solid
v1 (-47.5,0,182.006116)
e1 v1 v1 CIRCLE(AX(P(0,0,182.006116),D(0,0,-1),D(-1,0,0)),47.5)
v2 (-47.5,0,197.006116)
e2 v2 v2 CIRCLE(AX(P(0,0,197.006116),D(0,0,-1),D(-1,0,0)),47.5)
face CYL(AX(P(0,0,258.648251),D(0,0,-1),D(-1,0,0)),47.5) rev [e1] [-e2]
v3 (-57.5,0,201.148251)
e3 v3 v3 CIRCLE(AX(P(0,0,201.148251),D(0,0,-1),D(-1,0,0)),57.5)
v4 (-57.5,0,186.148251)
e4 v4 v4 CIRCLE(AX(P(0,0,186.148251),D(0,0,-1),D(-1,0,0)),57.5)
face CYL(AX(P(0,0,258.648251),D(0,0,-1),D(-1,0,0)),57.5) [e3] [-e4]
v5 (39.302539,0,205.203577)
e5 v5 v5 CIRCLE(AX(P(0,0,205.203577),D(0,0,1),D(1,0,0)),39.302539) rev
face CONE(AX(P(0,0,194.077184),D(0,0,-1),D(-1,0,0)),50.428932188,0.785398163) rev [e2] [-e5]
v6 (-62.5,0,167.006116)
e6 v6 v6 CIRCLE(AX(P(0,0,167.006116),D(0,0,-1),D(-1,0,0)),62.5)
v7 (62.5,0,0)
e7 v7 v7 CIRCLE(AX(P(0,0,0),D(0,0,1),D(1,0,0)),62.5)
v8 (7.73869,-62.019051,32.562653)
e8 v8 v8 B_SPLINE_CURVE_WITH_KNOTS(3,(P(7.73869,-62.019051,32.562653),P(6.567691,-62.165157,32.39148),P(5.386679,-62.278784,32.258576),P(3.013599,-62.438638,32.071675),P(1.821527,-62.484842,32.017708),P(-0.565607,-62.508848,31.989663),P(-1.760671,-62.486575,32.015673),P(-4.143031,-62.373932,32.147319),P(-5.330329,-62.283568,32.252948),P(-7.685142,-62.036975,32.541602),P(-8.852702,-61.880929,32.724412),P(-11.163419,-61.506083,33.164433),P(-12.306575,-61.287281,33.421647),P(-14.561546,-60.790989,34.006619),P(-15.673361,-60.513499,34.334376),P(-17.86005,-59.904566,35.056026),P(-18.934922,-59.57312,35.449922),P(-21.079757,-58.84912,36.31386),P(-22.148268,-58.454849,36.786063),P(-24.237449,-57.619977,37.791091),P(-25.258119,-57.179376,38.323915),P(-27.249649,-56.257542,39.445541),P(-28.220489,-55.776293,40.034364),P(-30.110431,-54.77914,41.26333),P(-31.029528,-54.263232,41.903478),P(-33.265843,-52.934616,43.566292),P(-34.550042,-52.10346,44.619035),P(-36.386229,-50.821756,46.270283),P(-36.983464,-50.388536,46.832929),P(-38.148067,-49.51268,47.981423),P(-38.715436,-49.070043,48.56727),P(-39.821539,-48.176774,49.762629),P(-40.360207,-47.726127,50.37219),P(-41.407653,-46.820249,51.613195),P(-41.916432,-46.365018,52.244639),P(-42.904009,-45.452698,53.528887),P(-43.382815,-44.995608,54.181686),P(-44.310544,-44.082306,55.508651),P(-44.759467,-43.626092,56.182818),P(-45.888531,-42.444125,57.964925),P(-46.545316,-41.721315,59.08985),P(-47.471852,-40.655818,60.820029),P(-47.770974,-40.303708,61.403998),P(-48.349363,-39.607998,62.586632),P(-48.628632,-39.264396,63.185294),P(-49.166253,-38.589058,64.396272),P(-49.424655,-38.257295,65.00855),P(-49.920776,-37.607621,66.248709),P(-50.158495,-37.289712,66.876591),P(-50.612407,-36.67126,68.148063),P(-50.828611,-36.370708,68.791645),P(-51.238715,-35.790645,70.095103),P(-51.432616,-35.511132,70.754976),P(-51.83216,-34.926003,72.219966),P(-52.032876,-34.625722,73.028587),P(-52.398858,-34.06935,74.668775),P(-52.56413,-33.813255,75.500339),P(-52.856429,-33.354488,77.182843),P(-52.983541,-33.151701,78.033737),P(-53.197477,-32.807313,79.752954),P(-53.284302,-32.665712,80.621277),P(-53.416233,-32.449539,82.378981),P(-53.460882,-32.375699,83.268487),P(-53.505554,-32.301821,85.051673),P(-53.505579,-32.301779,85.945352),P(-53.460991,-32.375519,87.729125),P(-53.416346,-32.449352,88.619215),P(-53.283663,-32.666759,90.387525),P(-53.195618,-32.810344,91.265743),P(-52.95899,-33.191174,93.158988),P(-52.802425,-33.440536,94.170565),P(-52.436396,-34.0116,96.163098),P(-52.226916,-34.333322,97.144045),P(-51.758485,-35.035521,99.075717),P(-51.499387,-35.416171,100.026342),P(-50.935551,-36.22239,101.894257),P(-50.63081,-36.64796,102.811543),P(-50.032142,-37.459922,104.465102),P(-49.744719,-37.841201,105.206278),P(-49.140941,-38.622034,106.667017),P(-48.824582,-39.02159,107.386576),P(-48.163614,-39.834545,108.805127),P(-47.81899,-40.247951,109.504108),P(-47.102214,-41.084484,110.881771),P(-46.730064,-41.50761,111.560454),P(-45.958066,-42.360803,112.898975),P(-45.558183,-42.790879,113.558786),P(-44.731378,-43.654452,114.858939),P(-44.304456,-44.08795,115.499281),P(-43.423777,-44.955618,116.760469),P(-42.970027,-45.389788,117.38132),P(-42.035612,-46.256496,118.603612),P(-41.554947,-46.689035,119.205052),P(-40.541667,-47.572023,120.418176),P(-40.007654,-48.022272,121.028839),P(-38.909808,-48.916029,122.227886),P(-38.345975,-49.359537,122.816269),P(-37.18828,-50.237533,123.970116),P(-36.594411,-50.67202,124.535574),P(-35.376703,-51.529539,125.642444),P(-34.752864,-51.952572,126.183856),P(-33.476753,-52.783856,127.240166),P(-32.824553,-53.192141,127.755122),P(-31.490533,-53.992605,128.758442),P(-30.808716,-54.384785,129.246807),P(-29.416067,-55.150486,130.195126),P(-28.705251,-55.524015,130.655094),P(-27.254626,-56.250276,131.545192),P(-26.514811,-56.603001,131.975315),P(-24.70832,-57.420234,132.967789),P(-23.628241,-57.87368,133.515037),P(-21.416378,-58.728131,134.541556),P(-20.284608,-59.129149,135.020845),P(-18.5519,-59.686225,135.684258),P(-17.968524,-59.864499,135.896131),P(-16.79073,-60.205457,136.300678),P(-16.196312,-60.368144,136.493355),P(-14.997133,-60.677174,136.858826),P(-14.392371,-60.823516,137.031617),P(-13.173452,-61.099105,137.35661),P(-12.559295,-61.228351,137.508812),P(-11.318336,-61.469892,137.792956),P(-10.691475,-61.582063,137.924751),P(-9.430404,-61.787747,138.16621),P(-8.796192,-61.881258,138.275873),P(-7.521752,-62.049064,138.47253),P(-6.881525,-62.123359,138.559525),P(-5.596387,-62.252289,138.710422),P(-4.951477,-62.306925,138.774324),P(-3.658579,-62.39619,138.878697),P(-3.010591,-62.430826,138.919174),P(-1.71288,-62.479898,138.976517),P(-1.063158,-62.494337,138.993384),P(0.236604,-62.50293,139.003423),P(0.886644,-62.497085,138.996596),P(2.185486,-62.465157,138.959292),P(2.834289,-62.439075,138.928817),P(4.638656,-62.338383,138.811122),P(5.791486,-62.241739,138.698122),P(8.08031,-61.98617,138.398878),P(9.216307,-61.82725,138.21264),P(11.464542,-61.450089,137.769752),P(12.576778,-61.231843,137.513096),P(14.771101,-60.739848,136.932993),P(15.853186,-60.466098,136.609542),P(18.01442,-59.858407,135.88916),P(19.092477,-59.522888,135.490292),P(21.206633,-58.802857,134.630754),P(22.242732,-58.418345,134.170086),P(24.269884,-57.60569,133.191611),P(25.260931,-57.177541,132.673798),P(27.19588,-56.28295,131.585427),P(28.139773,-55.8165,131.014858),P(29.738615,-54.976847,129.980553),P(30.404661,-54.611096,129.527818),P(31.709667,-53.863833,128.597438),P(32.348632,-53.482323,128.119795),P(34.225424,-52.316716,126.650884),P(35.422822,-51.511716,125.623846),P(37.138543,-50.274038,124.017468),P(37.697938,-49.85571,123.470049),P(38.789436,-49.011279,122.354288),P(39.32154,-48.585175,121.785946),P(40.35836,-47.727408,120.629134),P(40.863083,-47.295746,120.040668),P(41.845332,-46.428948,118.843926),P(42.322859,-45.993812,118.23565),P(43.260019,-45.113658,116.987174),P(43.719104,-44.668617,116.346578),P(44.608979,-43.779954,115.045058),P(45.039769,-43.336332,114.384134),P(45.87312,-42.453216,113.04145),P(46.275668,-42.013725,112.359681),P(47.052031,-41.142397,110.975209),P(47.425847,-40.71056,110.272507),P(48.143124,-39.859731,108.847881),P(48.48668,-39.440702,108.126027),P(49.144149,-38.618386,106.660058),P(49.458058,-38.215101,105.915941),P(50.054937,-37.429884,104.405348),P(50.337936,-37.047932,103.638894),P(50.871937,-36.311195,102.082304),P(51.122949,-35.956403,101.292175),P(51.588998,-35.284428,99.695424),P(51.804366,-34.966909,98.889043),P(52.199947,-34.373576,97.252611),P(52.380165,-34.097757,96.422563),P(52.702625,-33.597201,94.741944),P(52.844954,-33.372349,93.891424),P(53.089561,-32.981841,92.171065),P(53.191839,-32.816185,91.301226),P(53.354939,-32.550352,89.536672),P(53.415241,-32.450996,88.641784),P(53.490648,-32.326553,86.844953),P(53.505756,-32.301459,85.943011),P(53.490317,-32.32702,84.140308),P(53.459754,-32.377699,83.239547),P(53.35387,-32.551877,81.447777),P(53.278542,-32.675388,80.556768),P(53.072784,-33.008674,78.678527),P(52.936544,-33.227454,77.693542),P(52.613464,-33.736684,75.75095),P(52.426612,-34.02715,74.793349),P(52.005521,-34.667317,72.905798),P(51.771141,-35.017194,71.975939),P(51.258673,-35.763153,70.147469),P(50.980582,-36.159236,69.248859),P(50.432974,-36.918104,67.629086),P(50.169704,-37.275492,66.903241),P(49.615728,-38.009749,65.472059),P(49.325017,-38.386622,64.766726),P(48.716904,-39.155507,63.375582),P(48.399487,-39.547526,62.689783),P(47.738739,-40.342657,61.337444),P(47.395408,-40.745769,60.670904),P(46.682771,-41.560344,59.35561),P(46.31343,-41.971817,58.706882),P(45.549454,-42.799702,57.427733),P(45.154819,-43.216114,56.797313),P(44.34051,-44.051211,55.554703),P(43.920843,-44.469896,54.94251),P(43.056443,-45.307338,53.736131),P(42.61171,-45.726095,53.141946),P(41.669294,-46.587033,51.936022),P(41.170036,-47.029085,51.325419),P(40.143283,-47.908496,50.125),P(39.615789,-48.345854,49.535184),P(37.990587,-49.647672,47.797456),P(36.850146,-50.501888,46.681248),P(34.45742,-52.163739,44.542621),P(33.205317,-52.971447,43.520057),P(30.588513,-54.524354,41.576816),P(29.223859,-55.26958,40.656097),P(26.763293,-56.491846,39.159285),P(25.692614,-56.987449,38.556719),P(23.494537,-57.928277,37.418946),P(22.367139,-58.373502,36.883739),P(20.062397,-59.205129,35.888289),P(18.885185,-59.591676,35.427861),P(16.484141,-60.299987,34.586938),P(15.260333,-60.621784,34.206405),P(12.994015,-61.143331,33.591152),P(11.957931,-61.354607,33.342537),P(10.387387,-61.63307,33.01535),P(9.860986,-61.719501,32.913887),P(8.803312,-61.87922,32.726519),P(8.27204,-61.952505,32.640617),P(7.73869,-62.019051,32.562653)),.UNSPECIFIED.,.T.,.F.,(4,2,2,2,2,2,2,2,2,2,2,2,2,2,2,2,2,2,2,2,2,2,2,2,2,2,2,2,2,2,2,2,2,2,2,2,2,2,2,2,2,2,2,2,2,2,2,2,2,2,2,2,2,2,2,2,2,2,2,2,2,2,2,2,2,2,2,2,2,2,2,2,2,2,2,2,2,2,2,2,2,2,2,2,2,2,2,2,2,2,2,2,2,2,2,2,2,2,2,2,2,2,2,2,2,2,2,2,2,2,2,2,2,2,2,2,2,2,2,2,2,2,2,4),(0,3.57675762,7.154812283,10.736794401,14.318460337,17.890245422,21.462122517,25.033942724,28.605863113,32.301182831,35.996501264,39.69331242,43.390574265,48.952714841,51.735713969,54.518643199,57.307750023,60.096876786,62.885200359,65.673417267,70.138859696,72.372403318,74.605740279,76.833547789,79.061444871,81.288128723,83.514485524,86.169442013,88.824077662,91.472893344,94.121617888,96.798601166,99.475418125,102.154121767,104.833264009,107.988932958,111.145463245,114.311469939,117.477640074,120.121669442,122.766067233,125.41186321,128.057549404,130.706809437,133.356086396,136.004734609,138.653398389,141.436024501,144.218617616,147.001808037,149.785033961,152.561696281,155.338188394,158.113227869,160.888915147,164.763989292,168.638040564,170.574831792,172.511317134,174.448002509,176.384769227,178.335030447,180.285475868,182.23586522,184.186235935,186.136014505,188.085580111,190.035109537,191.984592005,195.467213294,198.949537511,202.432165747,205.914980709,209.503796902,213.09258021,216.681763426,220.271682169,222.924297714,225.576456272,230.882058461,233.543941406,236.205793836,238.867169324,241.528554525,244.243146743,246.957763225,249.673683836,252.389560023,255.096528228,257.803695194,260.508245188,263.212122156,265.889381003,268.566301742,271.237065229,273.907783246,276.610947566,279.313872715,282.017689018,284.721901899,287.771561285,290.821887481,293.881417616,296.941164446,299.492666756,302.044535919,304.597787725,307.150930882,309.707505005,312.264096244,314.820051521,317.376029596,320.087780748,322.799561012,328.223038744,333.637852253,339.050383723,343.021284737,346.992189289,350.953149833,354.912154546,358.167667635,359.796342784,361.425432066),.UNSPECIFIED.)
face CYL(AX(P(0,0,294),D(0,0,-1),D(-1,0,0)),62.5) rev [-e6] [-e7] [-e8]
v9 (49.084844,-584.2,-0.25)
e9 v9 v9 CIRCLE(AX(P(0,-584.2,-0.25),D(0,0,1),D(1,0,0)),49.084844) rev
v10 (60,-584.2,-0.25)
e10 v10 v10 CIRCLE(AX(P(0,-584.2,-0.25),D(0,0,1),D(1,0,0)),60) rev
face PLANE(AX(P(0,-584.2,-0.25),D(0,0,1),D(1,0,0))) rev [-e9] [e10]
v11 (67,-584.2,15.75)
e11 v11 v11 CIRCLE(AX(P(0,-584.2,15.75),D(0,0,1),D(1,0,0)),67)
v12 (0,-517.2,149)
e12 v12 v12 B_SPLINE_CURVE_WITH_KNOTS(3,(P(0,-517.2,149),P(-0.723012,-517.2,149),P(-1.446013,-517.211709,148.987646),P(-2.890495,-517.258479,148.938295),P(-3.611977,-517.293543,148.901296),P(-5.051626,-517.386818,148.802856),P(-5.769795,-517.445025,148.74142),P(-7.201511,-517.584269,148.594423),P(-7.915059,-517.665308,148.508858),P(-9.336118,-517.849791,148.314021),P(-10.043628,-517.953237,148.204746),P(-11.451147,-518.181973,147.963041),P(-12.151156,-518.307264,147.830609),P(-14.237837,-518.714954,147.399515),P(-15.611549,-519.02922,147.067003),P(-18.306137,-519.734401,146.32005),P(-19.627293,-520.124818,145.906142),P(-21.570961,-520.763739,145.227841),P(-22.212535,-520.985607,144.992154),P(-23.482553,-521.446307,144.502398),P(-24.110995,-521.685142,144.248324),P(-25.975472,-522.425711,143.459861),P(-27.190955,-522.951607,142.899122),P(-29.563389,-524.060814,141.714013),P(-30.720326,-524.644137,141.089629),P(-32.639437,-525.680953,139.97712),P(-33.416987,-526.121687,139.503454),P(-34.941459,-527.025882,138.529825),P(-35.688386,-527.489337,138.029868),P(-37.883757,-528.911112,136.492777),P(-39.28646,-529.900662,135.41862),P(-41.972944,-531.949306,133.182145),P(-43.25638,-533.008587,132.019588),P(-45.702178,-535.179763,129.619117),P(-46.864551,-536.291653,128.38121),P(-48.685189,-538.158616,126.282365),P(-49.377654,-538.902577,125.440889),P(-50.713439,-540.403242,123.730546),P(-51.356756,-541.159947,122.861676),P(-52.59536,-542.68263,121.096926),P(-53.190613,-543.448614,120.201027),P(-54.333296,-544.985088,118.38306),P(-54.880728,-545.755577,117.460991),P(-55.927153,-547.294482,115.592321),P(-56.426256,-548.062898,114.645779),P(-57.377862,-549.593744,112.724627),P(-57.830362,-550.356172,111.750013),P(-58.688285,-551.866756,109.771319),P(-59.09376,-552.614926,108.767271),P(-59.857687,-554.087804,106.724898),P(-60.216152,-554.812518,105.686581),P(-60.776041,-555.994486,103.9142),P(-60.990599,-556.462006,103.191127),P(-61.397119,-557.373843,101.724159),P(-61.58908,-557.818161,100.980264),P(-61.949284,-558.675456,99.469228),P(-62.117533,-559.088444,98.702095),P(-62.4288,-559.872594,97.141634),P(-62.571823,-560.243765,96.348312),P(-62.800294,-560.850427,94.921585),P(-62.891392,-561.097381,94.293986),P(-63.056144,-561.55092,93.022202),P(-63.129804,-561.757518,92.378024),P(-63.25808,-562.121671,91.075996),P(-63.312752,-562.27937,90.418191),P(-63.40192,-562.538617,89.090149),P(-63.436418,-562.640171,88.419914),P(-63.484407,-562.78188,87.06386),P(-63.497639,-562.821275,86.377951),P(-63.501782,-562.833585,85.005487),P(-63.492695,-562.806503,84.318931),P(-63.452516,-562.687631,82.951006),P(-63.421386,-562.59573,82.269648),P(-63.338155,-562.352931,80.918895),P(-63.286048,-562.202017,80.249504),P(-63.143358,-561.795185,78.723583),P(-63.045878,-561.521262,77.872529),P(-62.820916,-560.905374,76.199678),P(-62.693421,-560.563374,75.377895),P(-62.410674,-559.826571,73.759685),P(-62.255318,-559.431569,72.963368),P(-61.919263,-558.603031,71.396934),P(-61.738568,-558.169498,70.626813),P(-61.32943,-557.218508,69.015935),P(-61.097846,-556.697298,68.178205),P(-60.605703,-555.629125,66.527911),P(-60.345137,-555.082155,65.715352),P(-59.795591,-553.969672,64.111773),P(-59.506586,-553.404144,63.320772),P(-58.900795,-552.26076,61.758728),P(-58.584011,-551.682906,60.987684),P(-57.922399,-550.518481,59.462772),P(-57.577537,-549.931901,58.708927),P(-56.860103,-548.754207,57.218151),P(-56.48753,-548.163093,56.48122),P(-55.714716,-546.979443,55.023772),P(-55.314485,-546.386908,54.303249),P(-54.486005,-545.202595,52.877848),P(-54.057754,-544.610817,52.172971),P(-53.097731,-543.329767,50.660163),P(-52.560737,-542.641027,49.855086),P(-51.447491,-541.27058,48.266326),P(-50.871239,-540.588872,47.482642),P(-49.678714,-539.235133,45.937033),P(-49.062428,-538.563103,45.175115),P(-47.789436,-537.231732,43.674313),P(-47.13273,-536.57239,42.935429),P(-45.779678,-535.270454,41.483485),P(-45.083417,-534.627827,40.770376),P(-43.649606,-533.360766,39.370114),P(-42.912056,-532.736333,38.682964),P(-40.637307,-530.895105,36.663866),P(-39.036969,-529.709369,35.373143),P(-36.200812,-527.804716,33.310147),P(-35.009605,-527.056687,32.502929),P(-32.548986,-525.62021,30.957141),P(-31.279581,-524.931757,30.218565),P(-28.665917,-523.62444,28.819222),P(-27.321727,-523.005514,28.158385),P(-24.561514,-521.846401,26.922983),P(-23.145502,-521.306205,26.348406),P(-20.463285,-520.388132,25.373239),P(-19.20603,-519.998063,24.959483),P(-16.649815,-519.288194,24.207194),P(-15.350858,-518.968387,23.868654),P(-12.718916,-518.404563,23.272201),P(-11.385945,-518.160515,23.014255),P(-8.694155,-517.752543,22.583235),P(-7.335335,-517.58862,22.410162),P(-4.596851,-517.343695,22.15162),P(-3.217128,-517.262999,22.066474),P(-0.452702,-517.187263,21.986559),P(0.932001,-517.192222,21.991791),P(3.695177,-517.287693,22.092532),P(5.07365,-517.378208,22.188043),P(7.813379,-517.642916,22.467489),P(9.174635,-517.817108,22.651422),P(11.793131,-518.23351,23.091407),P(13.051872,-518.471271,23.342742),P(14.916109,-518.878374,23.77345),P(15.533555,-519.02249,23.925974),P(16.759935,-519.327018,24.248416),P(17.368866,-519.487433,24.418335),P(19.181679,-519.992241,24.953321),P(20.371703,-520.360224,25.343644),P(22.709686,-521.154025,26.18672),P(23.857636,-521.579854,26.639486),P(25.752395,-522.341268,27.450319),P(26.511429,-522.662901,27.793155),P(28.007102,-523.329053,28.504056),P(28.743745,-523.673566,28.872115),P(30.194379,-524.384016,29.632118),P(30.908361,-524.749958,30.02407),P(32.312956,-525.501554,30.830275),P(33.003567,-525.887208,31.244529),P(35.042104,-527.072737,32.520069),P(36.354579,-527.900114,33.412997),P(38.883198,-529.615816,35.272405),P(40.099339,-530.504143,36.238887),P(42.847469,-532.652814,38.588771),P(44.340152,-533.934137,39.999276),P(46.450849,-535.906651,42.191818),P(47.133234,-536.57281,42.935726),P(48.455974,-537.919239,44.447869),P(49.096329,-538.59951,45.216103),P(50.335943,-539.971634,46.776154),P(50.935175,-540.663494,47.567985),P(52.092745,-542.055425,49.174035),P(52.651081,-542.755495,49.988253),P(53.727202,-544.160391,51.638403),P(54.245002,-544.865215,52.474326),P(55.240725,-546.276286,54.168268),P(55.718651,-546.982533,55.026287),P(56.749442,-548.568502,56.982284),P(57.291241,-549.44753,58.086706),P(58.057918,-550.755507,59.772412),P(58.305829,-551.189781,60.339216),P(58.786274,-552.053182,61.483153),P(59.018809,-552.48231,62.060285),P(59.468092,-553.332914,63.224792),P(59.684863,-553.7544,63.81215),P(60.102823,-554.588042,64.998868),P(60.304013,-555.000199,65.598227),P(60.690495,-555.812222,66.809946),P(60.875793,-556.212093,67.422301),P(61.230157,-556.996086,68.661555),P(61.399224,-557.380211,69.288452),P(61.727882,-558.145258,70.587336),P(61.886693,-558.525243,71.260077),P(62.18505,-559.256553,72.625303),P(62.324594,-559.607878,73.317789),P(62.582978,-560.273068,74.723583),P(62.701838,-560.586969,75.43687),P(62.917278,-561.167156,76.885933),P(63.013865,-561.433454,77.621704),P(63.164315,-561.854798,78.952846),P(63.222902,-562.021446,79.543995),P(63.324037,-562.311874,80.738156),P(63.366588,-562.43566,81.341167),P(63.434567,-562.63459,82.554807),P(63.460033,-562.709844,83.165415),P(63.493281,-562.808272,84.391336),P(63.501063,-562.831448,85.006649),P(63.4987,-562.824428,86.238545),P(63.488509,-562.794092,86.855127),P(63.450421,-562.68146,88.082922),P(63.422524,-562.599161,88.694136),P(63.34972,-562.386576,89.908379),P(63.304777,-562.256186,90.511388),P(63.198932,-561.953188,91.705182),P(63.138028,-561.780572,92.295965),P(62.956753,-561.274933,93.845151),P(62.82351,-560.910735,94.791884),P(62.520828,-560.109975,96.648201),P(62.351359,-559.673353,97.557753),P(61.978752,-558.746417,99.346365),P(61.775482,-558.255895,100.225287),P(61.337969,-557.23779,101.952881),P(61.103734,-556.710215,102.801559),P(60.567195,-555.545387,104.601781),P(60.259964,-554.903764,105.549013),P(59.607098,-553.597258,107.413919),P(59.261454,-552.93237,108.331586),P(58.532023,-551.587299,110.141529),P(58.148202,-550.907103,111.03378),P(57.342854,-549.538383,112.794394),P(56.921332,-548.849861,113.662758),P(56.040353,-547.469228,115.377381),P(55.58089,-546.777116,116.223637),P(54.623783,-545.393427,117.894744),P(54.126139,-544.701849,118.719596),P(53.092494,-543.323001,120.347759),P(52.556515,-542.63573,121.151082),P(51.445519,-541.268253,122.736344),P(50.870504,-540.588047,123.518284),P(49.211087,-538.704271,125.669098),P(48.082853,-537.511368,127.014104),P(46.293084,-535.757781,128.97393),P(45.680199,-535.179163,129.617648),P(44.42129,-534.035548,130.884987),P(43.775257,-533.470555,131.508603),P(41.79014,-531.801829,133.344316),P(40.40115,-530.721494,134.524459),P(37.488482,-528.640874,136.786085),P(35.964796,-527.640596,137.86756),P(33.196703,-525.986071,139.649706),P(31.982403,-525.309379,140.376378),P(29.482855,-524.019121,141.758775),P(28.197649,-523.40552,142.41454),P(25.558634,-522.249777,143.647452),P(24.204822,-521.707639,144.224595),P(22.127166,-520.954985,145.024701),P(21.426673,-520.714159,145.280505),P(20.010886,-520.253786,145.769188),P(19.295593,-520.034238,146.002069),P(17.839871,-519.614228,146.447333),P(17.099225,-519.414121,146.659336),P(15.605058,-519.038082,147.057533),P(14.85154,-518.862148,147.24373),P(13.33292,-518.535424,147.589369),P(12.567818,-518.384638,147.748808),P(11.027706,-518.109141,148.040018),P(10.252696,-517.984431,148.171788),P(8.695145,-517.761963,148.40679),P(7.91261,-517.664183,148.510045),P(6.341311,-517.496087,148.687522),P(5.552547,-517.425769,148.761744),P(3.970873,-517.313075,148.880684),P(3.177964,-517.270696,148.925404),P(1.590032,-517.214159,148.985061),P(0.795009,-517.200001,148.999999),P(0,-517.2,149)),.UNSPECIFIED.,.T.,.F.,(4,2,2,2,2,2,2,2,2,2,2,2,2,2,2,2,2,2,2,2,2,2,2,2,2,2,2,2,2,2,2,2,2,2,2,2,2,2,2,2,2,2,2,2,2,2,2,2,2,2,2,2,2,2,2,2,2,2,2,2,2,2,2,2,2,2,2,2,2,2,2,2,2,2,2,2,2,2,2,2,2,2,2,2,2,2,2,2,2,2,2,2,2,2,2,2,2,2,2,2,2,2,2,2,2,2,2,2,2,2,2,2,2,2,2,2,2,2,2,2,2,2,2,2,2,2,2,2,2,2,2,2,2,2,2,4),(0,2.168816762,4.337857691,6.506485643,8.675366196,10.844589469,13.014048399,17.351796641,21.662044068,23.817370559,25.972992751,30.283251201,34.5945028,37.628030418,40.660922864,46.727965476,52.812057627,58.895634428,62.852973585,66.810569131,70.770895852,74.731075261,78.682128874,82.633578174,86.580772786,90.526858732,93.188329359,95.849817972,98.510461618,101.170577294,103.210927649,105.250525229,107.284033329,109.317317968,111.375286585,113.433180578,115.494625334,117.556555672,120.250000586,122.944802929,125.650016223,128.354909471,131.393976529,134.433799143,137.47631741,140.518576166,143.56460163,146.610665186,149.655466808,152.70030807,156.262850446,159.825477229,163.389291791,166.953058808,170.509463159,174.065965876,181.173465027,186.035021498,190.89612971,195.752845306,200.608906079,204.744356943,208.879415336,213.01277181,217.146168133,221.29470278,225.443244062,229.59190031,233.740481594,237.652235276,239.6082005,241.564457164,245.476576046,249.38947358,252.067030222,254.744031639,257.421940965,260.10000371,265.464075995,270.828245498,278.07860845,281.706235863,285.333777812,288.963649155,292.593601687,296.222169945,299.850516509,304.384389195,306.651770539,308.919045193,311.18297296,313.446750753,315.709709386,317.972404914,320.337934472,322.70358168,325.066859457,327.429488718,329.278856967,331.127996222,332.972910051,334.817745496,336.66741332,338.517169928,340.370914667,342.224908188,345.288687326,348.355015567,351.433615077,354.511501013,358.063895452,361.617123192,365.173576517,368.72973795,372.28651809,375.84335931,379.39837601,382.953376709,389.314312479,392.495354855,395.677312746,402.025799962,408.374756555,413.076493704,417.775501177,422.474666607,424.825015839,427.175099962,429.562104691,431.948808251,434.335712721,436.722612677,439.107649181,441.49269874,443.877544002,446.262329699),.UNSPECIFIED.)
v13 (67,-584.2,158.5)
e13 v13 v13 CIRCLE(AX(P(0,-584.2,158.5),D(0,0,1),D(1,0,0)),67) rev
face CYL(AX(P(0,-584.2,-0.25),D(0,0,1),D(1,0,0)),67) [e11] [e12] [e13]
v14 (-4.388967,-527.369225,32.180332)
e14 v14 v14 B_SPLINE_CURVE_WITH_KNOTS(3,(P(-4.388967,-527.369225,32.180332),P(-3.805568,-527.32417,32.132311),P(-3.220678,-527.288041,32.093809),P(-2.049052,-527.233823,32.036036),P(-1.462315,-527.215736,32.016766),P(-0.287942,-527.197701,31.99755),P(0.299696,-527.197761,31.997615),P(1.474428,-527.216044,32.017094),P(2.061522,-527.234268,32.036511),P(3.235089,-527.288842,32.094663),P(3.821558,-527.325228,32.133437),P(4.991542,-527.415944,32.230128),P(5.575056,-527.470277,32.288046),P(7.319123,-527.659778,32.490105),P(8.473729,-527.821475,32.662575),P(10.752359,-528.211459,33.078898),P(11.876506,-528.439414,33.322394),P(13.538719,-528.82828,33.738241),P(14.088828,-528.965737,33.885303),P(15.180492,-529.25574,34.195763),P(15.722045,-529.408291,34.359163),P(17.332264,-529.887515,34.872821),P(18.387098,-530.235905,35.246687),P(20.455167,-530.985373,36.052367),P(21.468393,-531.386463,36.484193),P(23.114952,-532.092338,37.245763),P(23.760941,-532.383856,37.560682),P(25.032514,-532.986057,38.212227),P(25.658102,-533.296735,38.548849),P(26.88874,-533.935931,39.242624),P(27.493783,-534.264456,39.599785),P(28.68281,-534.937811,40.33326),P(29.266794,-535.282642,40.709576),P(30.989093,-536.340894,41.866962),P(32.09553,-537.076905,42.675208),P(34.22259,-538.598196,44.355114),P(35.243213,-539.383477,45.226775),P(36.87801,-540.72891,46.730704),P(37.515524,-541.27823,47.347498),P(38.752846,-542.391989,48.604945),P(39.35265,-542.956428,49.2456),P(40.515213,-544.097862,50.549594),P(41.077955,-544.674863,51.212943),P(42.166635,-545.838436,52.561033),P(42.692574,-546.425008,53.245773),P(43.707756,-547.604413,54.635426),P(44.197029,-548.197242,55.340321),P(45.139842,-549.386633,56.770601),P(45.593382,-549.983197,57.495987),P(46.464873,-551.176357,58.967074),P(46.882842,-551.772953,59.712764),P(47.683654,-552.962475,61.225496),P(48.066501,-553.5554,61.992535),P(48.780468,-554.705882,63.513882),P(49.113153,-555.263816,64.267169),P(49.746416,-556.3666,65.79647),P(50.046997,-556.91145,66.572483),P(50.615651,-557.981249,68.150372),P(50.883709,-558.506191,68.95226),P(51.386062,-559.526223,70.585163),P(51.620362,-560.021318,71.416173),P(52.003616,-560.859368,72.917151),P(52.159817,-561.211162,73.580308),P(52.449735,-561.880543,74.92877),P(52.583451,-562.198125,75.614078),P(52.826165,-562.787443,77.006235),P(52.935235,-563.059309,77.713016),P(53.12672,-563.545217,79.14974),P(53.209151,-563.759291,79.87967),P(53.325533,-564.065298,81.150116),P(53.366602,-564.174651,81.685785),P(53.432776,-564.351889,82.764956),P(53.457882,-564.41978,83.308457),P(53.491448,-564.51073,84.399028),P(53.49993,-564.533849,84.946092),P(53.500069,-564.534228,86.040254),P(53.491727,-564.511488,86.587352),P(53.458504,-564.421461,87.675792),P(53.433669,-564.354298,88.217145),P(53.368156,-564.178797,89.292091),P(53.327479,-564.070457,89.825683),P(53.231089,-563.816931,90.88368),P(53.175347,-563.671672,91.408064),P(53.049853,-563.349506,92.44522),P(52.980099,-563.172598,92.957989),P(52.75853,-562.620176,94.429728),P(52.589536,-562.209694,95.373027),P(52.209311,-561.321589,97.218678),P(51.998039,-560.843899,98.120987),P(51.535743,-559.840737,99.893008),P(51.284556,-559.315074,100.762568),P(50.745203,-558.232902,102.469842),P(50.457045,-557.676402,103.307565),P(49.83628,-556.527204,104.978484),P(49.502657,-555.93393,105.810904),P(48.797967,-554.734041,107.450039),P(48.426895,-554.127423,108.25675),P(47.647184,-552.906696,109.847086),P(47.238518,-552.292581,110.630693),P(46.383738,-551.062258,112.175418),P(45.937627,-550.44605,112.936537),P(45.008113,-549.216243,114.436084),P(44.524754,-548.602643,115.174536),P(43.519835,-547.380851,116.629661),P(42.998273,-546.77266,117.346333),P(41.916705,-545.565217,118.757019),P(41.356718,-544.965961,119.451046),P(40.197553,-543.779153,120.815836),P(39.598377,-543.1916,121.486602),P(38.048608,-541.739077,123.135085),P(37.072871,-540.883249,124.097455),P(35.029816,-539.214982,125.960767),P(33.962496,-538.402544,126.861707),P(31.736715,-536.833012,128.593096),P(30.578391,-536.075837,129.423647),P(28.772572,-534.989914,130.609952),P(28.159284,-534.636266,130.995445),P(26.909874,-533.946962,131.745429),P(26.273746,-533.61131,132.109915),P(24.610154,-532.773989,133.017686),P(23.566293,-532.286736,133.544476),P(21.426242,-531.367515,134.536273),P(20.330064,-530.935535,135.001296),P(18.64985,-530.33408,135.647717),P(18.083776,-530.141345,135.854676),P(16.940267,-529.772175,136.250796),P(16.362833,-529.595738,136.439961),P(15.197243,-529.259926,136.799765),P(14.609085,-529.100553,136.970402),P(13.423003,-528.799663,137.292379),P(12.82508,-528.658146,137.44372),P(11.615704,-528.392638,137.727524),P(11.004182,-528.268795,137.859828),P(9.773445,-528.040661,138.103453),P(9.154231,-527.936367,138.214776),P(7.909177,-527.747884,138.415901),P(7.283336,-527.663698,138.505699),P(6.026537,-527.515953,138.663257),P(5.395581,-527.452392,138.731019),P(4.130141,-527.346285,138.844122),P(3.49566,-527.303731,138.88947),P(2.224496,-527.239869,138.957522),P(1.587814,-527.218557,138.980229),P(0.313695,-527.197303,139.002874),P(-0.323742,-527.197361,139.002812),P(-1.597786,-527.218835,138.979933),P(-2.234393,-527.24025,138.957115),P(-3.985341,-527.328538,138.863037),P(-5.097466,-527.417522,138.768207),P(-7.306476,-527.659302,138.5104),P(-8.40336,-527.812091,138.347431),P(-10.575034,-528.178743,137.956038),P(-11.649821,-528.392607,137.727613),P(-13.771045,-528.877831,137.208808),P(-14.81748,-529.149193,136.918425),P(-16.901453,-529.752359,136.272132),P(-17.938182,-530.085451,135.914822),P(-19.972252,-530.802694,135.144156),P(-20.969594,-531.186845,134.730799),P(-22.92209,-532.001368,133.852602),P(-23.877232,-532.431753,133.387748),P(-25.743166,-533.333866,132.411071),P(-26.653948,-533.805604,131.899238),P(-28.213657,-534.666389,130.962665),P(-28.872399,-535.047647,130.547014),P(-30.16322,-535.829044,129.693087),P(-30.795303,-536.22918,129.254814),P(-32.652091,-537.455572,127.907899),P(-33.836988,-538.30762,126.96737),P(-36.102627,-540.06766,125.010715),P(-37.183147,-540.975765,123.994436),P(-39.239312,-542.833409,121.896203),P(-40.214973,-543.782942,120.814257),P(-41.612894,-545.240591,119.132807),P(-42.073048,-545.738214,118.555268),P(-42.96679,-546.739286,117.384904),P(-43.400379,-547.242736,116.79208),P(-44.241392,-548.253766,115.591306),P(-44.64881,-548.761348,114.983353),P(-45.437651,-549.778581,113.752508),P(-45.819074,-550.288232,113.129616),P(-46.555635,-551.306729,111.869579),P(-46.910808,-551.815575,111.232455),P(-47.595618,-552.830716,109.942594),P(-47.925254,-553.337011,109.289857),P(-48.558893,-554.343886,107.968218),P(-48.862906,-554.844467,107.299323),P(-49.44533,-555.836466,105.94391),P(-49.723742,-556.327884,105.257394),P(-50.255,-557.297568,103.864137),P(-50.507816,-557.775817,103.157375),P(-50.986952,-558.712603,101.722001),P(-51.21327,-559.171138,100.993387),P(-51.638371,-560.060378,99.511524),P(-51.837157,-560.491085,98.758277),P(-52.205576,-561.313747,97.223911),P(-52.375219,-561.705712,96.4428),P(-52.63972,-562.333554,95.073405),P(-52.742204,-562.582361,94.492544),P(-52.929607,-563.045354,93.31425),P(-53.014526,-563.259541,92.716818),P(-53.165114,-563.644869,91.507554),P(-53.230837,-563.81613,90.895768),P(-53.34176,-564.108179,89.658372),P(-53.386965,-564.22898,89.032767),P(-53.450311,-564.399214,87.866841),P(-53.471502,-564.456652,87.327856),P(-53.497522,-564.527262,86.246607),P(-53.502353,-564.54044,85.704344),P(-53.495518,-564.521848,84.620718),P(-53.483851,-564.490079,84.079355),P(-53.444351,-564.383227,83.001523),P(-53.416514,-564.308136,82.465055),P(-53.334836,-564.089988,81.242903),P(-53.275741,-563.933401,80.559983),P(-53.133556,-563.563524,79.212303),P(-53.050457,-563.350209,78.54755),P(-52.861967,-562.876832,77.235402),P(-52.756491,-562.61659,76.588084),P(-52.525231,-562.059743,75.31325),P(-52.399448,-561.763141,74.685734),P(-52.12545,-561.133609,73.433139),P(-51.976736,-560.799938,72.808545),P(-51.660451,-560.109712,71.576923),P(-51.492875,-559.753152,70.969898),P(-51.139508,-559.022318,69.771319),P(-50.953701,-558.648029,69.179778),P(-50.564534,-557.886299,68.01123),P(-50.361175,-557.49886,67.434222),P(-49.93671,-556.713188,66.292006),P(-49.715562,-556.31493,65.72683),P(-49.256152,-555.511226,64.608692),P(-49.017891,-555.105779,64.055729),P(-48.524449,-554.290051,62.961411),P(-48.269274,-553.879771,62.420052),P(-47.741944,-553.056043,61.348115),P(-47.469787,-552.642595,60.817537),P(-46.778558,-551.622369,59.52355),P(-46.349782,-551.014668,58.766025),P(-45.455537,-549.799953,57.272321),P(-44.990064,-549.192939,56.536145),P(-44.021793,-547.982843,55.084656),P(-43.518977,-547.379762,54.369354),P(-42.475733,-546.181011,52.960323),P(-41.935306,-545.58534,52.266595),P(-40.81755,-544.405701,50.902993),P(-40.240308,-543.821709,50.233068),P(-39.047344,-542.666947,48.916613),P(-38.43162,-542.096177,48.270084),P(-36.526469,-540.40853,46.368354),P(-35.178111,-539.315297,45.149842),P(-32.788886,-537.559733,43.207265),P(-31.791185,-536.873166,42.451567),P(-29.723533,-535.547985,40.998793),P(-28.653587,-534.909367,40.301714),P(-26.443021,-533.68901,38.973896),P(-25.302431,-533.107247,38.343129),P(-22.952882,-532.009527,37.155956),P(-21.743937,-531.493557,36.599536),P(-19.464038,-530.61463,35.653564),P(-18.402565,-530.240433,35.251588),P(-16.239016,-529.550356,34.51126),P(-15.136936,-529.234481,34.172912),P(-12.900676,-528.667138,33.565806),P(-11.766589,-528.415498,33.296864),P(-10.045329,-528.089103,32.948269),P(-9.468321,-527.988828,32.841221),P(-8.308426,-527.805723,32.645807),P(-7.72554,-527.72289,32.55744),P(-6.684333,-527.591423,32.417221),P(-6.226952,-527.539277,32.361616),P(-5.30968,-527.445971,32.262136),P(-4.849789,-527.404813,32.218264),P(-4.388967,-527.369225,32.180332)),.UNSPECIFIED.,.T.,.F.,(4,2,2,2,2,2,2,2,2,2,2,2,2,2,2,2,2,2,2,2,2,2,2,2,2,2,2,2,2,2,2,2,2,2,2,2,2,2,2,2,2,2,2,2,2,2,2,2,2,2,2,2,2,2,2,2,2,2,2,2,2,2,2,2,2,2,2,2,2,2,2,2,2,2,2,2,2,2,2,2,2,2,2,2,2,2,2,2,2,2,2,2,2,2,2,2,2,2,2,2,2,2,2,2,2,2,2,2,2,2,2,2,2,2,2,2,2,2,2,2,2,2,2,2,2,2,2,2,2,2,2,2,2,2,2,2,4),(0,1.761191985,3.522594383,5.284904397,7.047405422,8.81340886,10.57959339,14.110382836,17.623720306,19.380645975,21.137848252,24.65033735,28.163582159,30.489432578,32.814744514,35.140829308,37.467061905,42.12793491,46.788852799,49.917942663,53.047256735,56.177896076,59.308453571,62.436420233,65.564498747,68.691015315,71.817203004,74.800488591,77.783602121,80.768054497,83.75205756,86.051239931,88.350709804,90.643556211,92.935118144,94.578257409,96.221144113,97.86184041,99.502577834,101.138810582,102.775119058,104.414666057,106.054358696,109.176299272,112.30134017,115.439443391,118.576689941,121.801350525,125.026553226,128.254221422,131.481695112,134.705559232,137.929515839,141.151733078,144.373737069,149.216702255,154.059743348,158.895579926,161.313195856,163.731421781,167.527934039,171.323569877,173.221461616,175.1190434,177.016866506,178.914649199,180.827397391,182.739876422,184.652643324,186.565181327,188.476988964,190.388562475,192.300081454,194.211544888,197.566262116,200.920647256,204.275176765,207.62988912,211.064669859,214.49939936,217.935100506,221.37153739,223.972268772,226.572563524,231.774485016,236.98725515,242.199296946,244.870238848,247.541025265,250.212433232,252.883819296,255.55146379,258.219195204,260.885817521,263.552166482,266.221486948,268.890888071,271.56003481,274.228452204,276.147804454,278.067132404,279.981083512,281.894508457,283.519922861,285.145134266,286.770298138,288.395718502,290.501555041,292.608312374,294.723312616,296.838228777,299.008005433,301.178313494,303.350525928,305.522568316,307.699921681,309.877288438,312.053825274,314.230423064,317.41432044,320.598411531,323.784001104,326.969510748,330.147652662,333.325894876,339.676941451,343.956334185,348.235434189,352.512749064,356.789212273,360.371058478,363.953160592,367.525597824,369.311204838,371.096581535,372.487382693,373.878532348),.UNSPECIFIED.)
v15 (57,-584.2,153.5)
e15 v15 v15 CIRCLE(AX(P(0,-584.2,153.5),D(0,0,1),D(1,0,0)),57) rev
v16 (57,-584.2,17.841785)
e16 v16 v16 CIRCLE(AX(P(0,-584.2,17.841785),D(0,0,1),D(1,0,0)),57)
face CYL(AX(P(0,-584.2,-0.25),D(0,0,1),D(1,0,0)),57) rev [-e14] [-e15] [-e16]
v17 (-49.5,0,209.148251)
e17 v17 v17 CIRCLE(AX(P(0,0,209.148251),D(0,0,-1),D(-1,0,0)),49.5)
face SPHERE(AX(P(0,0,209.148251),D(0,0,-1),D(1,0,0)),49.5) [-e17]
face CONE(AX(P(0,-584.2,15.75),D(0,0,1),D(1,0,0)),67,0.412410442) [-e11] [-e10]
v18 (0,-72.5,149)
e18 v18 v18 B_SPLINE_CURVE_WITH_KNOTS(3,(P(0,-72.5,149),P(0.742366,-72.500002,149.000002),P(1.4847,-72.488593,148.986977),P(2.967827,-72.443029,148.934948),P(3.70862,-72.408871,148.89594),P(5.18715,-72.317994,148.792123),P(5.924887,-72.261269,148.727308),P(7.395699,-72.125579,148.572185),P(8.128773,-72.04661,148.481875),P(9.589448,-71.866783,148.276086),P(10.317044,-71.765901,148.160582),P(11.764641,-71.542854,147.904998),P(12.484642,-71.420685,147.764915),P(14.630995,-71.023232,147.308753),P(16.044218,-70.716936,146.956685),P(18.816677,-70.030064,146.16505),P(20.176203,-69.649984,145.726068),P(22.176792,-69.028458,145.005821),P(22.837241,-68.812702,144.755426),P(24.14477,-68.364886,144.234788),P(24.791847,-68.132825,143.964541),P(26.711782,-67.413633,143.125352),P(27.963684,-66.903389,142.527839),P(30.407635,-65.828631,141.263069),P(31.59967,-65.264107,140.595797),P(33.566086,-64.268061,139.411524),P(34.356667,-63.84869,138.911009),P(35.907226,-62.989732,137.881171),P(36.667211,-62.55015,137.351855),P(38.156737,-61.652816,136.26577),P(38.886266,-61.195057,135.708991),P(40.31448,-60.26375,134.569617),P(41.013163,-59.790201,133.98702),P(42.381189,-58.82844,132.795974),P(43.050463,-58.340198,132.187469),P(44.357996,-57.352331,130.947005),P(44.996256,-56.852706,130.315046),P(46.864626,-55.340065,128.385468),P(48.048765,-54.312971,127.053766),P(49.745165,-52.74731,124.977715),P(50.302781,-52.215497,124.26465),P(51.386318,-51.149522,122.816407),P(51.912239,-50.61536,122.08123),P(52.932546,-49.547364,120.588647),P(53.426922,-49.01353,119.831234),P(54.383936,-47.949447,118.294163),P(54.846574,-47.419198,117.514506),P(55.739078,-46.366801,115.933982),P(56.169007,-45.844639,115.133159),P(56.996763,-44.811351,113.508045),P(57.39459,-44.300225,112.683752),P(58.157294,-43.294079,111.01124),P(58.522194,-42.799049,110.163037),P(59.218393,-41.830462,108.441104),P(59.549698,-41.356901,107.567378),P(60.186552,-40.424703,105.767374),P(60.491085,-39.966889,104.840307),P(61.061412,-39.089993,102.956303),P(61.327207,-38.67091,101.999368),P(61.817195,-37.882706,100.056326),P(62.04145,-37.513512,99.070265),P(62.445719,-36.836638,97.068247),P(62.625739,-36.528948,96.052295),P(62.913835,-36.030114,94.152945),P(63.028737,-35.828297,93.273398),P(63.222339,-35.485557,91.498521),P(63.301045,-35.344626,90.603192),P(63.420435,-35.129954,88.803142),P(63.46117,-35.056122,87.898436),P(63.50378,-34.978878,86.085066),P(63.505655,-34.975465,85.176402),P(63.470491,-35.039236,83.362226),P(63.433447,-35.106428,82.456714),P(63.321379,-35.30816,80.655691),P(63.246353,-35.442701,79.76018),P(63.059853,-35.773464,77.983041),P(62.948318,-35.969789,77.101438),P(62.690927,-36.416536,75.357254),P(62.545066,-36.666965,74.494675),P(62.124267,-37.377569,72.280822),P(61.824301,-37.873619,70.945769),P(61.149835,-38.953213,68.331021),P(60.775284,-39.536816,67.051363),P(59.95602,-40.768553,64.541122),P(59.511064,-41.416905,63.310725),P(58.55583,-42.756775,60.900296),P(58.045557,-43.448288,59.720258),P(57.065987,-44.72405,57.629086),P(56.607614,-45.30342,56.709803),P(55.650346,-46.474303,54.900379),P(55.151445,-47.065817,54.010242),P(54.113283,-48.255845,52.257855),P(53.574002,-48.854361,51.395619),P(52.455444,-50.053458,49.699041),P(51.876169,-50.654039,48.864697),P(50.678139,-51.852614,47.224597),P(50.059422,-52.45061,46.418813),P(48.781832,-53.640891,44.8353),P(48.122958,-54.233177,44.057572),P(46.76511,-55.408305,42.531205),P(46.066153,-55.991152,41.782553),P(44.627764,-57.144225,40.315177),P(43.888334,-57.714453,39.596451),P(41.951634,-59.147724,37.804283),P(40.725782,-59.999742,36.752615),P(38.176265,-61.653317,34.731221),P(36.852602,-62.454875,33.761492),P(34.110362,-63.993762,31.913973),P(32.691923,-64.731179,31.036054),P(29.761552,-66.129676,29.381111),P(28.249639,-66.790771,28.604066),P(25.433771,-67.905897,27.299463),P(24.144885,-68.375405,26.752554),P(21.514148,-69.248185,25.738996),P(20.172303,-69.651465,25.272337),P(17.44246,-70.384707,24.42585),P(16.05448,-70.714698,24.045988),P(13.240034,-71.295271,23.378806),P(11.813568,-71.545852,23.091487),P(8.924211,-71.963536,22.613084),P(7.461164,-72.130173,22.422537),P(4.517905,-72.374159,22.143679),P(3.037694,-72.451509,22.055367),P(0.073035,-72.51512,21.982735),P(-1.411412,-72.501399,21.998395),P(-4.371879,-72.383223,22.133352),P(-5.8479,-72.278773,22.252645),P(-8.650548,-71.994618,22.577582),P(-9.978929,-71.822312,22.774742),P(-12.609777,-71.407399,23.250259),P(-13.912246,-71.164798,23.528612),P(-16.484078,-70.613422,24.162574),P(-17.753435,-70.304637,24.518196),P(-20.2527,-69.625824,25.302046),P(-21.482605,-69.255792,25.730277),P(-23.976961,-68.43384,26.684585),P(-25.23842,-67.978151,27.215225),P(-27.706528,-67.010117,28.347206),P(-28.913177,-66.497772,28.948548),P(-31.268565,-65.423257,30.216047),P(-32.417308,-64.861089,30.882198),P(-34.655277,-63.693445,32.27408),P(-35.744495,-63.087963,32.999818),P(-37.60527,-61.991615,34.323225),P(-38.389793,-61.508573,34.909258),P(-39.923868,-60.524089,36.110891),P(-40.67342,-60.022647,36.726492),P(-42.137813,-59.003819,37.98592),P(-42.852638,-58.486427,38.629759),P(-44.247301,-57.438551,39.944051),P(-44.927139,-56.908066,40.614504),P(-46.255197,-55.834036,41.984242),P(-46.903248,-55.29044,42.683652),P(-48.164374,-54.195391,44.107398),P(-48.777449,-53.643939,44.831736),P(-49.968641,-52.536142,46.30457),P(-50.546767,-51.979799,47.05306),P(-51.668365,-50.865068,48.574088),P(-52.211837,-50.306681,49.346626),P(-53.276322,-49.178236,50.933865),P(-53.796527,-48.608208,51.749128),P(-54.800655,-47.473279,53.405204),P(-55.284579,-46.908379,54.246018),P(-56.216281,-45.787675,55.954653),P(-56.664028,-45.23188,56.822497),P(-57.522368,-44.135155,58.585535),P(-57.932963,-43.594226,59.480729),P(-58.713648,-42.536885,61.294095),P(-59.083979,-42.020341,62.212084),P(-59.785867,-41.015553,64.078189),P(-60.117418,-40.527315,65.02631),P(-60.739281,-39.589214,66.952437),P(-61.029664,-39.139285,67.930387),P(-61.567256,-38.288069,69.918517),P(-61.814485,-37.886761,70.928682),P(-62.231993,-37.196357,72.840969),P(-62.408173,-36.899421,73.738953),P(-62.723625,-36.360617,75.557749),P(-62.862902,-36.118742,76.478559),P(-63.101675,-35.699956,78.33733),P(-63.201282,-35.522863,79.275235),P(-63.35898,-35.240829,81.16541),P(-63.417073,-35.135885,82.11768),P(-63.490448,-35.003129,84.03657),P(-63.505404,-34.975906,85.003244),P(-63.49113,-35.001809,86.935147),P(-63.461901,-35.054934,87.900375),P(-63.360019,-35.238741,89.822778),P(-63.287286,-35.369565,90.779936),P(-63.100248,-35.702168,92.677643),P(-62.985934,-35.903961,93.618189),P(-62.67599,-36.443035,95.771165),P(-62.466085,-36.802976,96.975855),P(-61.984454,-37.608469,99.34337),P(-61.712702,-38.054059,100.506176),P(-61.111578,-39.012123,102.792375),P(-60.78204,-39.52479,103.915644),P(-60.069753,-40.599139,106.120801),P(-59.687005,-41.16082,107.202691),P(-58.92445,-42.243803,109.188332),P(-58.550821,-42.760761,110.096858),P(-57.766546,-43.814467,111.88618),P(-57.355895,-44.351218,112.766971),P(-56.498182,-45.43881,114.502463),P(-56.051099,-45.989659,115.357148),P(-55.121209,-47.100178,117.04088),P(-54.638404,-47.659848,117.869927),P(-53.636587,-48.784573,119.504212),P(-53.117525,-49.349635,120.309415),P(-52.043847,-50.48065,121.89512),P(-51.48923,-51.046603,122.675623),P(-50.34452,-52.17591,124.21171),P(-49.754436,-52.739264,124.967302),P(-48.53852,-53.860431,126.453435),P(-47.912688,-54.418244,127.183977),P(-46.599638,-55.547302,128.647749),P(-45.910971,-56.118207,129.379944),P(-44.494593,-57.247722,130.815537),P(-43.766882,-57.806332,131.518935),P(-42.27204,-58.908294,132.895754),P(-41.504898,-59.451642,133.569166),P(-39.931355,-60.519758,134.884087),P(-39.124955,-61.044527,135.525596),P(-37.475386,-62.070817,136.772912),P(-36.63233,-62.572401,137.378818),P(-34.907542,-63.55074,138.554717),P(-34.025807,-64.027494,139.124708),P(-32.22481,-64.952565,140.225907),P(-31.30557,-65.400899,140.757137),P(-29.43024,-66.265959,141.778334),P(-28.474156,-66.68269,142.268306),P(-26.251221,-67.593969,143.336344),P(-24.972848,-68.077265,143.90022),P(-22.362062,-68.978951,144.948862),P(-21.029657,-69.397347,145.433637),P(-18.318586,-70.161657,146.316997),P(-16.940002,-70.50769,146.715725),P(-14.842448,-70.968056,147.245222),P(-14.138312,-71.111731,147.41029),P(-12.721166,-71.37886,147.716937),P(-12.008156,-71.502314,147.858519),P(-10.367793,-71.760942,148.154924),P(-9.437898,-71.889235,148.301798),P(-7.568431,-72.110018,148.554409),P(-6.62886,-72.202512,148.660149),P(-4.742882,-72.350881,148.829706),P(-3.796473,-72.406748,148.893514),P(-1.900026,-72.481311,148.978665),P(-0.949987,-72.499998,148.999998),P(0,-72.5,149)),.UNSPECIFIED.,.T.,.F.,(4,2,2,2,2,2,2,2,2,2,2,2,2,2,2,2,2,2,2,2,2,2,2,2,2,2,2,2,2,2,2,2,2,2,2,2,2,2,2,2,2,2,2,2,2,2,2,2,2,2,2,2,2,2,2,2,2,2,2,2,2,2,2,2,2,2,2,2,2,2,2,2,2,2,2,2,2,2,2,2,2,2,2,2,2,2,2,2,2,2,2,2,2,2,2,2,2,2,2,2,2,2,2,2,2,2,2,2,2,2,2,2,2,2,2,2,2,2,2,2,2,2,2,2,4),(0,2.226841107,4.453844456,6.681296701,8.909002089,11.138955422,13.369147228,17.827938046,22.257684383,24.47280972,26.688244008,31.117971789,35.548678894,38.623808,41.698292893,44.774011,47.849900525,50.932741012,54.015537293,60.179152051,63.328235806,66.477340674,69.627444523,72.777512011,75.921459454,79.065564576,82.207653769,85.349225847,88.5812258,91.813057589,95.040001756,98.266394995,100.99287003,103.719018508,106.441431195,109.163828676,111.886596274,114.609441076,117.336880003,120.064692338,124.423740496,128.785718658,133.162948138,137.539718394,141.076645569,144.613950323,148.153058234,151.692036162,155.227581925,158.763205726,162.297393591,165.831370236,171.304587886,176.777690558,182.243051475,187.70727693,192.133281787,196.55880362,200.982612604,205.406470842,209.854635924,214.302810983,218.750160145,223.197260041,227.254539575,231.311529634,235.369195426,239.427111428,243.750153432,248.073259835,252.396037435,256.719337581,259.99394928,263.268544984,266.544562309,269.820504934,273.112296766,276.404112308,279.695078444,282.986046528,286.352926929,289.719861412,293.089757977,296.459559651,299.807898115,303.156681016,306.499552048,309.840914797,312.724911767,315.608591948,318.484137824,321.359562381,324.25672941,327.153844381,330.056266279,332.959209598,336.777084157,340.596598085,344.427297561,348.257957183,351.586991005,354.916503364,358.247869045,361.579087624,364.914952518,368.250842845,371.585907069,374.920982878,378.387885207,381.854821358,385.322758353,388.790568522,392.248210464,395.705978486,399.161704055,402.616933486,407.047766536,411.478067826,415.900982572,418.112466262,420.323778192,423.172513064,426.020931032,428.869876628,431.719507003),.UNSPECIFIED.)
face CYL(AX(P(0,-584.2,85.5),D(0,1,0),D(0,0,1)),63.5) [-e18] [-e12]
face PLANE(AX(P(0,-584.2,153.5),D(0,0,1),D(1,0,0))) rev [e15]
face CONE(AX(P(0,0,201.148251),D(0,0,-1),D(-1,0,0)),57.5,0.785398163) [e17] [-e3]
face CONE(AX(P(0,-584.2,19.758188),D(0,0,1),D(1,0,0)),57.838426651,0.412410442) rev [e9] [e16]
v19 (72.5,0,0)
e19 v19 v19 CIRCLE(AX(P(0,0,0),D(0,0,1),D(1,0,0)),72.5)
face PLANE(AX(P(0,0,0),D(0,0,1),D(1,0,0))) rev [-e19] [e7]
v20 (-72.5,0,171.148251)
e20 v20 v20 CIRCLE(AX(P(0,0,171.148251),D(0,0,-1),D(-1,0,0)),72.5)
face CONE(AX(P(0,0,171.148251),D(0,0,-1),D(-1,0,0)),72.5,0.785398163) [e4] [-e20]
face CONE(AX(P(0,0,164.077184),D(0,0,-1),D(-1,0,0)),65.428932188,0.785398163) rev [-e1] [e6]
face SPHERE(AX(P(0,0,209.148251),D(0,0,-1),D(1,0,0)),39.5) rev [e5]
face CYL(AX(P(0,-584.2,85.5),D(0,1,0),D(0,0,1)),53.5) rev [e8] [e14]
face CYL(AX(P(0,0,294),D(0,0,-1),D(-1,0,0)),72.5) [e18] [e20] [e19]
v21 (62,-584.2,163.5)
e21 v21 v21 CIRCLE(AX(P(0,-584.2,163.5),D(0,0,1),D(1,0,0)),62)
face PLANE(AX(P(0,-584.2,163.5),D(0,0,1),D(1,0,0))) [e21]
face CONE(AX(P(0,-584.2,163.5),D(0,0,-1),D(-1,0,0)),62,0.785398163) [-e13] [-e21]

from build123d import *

# Parameters (mm, degrees)
SKETCH1_R                = 72.5
BOSS_EXTRUDE1_DEPTH      = 294
FILLET1_R                = 72.5
SKETCH2_R                = 63.5
BOSS_EXTRUDE2_DEPTH      = 584.2
BOSS_EXTRUDE3_DEPTH      = 78
BOSS_EXTRUDE3_DEPTH_BACK = 85.75
SKETCH3_R                = 67
CHAMFER1_SIZE            = 5
CHAMFER2_SIZE            = 7
CHAMFER2_SIZE2           = 16
SHELL1_3_OUTLINE_W       = 53.5
SHELL1_3_OUTLINE_H       = 532.228338498


with BuildPart() as part:
    # Sketch1 → Boss-Extrude1 (new body)
    with BuildSketch(Plane.XY):
        Circle(SKETCH1_R)
    extrude(amount=BOSS_EXTRUDE1_DEPTH)

    # Fillet1
    fillet1_edges = [part.edges().sort_by_distance(p)[0] for p in [
        (-72.5, 0, 294),
    ]]
    fillet(fillet1_edges, radius=FILLET1_R)

    # Sketch2 → Boss-Extrude2 (add)
    with BuildSketch(Plane(origin=(0, 0, 0), x_dir=(1, 0, 0), z_dir=(0, 1, 0))):
        with Locations(Location((0, -85.5, 0), (0, 0, 270))):
            Circle(SKETCH2_R)
    extrude(amount=-BOSS_EXTRUDE2_DEPTH)

    # Sketch3 → Boss-Extrude3 (add, two sides: drawn at the far end of the back side and taken through both)
    with BuildSketch(Plane.XY.offset(85.5).offset(-BOSS_EXTRUDE3_DEPTH_BACK)):
        with Locations((0, -584.2)):
            Circle(SKETCH3_R)
    extrude(amount=BOSS_EXTRUDE3_DEPTH + BOSS_EXTRUDE3_DEPTH_BACK)

    # Chamfer1
    chamfer1_edges = [part.edges().sort_by_distance(p)[0] for p in [
        (-67, -584.2, 163.5),
    ]]
    chamfer(chamfer1_edges, length=CHAMFER1_SIZE)

    # Chamfer2
    chamfer2_edges = [part.edges().sort_by_distance(p)[0] for p in [
        (-67, -584.2, -0.25),
    ]]
    chamfer2_side = [part.faces().sort_by_distance(p)[0] for p in [
        (0, -584.2, -0.25),
    ]]
    chamfer(chamfer2_edges, length=CHAMFER2_SIZE, length2=CHAMFER2_SIZE2, reference=chamfer2_side[0])

    # Sketch4 → Cut-Revolve1 (revolve, cut)
    with BuildSketch(Plane(origin=(0, 0, 0), x_dir=(1, 0, 0), z_dir=(0, 1, 0)), mode=Mode.PRIVATE) as cut_revolve1_sk:
        with BuildLine():
            Line((81.109243283, -151.148251361), (72.5, -151.148251361))
            Line((72.5, -151.148251361), (72.5, -171.148251361))
            Line((72.5, -171.148251361), (57.5, -186.148251361))
            Line((57.5, -186.148251361), (57.5, -201.148251361))
            Line((57.5, -201.148251361), (49.5, -209.148251361))
            ThreePointArc((49.5, -209.148251361), (35.001785669, -244.15003703), (0, -258.648251361))
            Line((0, -258.648251361), (0, -319.881343941))
            Line((0, -319.881343941), (156.304849296, -319.881343941))
            Line((156.304849296, -319.881343941), (156.304849296, -151.148251361))
            Line((156.304849296, -151.148251361), (81.109243283, -151.148251361))
        make_face()
    revolve(cut_revolve1_sk.sketch.rotate(Axis((0, 0, 258.648251361), (0, 0, 1)), 180), axis=Axis((0, 0, 258.648251361), (0, 0, 1)), mode=Mode.SUBTRACT)

    # Shell1: read off the stored shape, not the designer's step
    # Shell1 outline → Shell1 (revolve, cut)
    with BuildSketch(Plane.XZ.offset(584.2)):
        Polygon((49.084844252, -0.25), (57, 17.841784567), (57, 153.5), (0, 153.5), (0, -0.25), align=None)
    revolve(axis=Axis((0, -584.2, 0), (0, 0, 1)), mode=Mode.SUBTRACT)

    # Shell1 2 outline → Shell1 2 (revolve, cut)
    with BuildSketch(Plane.XZ):
        with BuildLine():
            Line((62.5, 0), (62.5, 167.006115737))
            Line((62.5, 167.006115737), (47.5, 182.006115737))
            Line((47.5, 182.006115737), (47.5, 197.006115737))
            Line((47.5, 197.006115737), (39.302538652, 205.203577042))
            ThreePointArc((39.302538652, 205.203577042), (29.292188682, 235.647641584), (0, 248.648251361))
            Line((0, 248.648251361), (0, 0))
            Line((0, 0), (62.5, 0))
        make_face()
    revolve(axis=Axis((0, 0, 0), (0, 0, 1)), mode=Mode.SUBTRACT)

    # Shell1 3 outline → Shell1 3 (revolve, cut)
    with BuildSketch(Plane.XY.offset(85.5)):
        with Locations((26.75, -298.423797413)):
            Rectangle(SHELL1_3_OUTLINE_W, SHELL1_3_OUTLINE_H)
    revolve(axis=Axis((0, 0, 85.5), (0, 1, 0)), mode=Mode.SUBTRACT)


solid = part.part
